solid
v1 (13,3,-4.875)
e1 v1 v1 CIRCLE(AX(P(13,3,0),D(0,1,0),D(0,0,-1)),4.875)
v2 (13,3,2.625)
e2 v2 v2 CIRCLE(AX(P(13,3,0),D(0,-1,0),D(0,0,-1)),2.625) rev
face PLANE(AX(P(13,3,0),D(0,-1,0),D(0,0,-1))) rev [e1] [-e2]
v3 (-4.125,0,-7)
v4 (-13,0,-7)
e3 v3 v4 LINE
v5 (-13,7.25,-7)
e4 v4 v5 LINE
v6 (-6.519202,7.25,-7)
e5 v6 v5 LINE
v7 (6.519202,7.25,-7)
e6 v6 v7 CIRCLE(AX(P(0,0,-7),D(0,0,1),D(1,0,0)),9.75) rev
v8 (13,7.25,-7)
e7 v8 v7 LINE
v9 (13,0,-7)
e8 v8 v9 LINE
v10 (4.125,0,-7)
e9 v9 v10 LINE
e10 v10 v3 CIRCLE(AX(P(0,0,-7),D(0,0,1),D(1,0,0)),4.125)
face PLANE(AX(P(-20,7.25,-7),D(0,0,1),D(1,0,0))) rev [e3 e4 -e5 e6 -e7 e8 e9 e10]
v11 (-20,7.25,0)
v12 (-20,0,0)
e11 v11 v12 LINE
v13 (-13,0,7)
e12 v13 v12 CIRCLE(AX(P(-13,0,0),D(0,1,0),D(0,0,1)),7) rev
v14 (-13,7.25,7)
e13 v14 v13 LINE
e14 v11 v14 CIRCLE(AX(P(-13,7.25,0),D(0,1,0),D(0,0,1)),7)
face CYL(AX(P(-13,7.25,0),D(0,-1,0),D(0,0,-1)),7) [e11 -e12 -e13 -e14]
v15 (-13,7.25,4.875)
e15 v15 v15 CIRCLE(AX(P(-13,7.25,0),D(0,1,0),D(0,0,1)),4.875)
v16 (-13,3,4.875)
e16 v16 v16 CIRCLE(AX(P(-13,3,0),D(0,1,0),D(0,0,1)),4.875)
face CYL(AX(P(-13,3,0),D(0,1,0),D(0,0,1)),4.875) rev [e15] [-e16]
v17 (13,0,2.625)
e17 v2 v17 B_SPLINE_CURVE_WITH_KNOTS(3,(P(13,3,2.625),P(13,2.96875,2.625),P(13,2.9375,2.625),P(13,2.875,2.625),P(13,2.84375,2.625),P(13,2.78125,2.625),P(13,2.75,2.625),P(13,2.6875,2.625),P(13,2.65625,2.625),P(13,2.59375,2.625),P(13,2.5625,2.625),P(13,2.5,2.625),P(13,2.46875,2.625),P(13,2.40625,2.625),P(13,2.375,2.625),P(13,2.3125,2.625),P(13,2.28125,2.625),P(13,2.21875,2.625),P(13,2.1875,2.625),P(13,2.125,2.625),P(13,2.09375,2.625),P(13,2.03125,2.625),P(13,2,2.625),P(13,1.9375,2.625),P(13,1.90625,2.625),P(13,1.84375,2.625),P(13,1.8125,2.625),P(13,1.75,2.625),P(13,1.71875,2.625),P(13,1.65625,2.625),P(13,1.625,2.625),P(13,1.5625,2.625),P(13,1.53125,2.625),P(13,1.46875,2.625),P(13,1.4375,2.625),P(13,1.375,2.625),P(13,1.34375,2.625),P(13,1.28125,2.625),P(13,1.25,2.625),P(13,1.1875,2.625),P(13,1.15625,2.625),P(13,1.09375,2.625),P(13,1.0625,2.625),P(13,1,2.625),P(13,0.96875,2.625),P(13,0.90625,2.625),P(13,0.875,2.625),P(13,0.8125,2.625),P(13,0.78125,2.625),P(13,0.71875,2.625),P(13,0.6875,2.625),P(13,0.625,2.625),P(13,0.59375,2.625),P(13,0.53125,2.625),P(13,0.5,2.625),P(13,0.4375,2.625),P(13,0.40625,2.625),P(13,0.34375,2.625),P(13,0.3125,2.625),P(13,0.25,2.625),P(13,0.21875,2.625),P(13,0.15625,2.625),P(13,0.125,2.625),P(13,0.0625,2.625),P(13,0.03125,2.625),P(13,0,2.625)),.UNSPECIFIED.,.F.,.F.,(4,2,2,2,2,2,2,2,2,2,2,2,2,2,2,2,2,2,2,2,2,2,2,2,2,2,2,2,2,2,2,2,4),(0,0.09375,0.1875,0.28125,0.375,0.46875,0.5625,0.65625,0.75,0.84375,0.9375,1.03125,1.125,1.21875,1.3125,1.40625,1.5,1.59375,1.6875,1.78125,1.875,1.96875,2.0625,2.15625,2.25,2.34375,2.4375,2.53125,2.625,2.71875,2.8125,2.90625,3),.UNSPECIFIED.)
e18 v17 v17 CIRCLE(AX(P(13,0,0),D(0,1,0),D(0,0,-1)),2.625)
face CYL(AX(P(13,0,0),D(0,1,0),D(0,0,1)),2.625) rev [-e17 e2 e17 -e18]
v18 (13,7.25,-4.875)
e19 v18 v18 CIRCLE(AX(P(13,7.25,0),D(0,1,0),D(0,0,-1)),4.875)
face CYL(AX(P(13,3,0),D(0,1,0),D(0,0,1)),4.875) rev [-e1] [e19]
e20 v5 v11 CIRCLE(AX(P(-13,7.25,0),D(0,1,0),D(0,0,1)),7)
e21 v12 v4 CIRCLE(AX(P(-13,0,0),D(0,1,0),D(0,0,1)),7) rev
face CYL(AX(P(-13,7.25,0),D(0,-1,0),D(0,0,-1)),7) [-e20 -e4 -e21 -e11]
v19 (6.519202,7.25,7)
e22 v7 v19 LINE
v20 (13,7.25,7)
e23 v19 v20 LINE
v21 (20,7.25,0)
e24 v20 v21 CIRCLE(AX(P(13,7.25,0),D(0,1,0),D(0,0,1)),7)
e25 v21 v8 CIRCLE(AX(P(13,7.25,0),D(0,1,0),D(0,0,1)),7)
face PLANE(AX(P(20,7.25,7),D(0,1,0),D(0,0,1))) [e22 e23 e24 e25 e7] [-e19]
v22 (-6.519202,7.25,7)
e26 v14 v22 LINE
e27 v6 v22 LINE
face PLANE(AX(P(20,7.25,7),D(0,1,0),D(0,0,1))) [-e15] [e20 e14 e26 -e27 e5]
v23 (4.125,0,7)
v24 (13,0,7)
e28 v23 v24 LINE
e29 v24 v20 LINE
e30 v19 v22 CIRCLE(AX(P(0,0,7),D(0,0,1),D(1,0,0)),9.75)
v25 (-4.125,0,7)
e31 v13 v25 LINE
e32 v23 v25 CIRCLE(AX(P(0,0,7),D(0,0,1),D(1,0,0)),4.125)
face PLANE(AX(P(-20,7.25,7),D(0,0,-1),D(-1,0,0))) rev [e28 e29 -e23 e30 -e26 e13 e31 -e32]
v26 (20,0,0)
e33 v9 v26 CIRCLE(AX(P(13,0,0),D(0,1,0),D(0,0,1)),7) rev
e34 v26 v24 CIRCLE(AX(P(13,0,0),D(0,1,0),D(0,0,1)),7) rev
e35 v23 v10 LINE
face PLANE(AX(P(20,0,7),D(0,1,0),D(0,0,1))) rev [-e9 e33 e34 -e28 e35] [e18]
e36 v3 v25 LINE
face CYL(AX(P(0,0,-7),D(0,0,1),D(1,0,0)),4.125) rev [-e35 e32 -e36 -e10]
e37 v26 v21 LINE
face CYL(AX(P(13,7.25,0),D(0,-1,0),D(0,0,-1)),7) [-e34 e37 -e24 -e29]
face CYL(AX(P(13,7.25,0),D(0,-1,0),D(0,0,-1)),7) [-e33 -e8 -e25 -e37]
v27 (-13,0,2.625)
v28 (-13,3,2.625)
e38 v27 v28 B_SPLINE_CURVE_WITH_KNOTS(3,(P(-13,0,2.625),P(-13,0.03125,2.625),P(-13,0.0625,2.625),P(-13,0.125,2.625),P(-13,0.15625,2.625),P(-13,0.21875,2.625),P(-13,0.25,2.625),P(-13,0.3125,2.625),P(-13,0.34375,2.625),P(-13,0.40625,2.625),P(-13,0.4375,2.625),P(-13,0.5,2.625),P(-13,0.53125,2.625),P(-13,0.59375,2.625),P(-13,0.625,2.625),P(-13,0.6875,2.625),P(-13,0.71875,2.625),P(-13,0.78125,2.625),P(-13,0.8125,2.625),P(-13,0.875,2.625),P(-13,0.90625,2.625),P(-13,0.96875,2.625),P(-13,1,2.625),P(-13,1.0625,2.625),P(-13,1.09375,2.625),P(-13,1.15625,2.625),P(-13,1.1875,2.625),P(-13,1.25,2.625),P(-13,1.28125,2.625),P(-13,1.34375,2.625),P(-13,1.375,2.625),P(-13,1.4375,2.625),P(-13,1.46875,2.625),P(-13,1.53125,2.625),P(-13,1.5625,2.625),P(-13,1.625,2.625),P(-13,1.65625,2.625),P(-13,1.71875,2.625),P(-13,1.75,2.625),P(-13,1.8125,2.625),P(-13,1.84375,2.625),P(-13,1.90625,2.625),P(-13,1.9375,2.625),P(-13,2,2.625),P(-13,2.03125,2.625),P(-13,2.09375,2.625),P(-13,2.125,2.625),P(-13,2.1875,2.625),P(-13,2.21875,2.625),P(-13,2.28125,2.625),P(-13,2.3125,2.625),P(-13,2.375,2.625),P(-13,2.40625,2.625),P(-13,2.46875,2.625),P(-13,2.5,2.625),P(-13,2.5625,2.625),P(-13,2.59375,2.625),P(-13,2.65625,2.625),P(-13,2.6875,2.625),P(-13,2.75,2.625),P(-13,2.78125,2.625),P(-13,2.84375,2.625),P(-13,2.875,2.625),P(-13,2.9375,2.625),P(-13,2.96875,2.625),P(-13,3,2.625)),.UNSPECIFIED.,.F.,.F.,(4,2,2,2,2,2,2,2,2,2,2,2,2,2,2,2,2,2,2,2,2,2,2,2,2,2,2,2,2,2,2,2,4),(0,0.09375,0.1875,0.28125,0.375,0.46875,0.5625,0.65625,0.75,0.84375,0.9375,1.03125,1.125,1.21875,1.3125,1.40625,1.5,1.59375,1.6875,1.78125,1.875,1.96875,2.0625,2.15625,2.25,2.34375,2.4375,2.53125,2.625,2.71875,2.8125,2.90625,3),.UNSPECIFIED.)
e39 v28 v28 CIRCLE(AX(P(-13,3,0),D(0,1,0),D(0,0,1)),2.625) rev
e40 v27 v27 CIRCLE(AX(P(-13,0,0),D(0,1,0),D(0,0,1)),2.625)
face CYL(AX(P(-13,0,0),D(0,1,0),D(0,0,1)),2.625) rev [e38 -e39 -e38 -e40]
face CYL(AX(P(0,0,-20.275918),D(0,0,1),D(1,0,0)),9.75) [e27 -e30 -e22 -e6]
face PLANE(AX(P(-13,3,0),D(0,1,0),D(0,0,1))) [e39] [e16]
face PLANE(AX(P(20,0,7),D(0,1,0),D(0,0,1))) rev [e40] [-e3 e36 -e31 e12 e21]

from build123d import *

# Parameters (mm, degrees)
SKETCH1_W           = 40
SKETCH1_H           = 14
BOSS_EXTRUDE1_DEPTH = 7.25
FILLET1_R           = 7
SKETCH2_R           = 2.625
CUT_EXTRUDE1_DEPTH  = 23.395591084
SKETCH3_R           = 4.875
CUT_EXTRUDE2_DEPTH  = 4.25
BOSS_EXTRUDE2_DEPTH = 14
SKETCH5_R           = 4.125
CUT_EXTRUDE3_DEPTH  = 27.288067635


with BuildPart() as part:
    # Sketch1 → Boss-Extrude1 (new body)
    with BuildSketch(Plane(origin=(0, 0, 0), x_dir=(1, 0, 0), z_dir=(0, 1, 0))):
        Rectangle(SKETCH1_W, SKETCH1_H)
    extrude(amount=BOSS_EXTRUDE1_DEPTH)

    # Fillet1
    fillet1_edges = [part.edges().sort_by_distance(p)[0] for p in [
        (-20, 3.625, 7),
        (20, 3.625, 7),
        (20, 3.625, -7),
        (-20, 3.625, -7),
    ]]
    fillet(fillet1_edges, radius=FILLET1_R - 0.0001)  # a hair under: the kernel refuses the full size

    # Sketch2 → Cut-Extrude1 (cut, through all)
    with BuildSketch(Plane(origin=(0, 7.25, 0), x_dir=(1, 0, 0), z_dir=(0, 1, 0))):
        with Locations(Location((-13, 0, 0), (0, 0, 270))):
            Circle(SKETCH2_R)
        with Locations(Location((13, 0, 0), (0, 0, 270))):
            Circle(SKETCH2_R)
    extrude(amount=-CUT_EXTRUDE1_DEPTH, mode=Mode.SUBTRACT)

    # Sketch3 → Cut-Extrude2 (cut)
    with BuildSketch(Plane(origin=(0, 7.25, 0), x_dir=(1, 0, 0), z_dir=(0, 1, 0))):
        with Locations(Location((-13, 0, 0), (0, 0, 270))):
            Circle(SKETCH3_R)
        with Locations(Location((13, 0, 0), (0, 0, 90))):
            Circle(SKETCH3_R)
    extrude(amount=-CUT_EXTRUDE2_DEPTH, mode=Mode.SUBTRACT)

    # Sketch4 → Boss-Extrude2 (add)
    with BuildSketch(Plane.XY.offset(7)):
        with BuildLine():
            Line((6.519202405, 7.25), (-6.519202405, 7.25))
            ThreePointArc((-6.519202405, 7.25), (0, 9.75), (6.519202405, 7.25))
        make_face()
    extrude(amount=-BOSS_EXTRUDE2_DEPTH)

    # Sketch5 → Cut-Extrude3 (cut, through all)
    with BuildSketch(Plane.XY.offset(7)):
        Circle(SKETCH5_R)
    extrude(amount=-CUT_EXTRUDE3_DEPTH, mode=Mode.SUBTRACT)


solid = part.part
